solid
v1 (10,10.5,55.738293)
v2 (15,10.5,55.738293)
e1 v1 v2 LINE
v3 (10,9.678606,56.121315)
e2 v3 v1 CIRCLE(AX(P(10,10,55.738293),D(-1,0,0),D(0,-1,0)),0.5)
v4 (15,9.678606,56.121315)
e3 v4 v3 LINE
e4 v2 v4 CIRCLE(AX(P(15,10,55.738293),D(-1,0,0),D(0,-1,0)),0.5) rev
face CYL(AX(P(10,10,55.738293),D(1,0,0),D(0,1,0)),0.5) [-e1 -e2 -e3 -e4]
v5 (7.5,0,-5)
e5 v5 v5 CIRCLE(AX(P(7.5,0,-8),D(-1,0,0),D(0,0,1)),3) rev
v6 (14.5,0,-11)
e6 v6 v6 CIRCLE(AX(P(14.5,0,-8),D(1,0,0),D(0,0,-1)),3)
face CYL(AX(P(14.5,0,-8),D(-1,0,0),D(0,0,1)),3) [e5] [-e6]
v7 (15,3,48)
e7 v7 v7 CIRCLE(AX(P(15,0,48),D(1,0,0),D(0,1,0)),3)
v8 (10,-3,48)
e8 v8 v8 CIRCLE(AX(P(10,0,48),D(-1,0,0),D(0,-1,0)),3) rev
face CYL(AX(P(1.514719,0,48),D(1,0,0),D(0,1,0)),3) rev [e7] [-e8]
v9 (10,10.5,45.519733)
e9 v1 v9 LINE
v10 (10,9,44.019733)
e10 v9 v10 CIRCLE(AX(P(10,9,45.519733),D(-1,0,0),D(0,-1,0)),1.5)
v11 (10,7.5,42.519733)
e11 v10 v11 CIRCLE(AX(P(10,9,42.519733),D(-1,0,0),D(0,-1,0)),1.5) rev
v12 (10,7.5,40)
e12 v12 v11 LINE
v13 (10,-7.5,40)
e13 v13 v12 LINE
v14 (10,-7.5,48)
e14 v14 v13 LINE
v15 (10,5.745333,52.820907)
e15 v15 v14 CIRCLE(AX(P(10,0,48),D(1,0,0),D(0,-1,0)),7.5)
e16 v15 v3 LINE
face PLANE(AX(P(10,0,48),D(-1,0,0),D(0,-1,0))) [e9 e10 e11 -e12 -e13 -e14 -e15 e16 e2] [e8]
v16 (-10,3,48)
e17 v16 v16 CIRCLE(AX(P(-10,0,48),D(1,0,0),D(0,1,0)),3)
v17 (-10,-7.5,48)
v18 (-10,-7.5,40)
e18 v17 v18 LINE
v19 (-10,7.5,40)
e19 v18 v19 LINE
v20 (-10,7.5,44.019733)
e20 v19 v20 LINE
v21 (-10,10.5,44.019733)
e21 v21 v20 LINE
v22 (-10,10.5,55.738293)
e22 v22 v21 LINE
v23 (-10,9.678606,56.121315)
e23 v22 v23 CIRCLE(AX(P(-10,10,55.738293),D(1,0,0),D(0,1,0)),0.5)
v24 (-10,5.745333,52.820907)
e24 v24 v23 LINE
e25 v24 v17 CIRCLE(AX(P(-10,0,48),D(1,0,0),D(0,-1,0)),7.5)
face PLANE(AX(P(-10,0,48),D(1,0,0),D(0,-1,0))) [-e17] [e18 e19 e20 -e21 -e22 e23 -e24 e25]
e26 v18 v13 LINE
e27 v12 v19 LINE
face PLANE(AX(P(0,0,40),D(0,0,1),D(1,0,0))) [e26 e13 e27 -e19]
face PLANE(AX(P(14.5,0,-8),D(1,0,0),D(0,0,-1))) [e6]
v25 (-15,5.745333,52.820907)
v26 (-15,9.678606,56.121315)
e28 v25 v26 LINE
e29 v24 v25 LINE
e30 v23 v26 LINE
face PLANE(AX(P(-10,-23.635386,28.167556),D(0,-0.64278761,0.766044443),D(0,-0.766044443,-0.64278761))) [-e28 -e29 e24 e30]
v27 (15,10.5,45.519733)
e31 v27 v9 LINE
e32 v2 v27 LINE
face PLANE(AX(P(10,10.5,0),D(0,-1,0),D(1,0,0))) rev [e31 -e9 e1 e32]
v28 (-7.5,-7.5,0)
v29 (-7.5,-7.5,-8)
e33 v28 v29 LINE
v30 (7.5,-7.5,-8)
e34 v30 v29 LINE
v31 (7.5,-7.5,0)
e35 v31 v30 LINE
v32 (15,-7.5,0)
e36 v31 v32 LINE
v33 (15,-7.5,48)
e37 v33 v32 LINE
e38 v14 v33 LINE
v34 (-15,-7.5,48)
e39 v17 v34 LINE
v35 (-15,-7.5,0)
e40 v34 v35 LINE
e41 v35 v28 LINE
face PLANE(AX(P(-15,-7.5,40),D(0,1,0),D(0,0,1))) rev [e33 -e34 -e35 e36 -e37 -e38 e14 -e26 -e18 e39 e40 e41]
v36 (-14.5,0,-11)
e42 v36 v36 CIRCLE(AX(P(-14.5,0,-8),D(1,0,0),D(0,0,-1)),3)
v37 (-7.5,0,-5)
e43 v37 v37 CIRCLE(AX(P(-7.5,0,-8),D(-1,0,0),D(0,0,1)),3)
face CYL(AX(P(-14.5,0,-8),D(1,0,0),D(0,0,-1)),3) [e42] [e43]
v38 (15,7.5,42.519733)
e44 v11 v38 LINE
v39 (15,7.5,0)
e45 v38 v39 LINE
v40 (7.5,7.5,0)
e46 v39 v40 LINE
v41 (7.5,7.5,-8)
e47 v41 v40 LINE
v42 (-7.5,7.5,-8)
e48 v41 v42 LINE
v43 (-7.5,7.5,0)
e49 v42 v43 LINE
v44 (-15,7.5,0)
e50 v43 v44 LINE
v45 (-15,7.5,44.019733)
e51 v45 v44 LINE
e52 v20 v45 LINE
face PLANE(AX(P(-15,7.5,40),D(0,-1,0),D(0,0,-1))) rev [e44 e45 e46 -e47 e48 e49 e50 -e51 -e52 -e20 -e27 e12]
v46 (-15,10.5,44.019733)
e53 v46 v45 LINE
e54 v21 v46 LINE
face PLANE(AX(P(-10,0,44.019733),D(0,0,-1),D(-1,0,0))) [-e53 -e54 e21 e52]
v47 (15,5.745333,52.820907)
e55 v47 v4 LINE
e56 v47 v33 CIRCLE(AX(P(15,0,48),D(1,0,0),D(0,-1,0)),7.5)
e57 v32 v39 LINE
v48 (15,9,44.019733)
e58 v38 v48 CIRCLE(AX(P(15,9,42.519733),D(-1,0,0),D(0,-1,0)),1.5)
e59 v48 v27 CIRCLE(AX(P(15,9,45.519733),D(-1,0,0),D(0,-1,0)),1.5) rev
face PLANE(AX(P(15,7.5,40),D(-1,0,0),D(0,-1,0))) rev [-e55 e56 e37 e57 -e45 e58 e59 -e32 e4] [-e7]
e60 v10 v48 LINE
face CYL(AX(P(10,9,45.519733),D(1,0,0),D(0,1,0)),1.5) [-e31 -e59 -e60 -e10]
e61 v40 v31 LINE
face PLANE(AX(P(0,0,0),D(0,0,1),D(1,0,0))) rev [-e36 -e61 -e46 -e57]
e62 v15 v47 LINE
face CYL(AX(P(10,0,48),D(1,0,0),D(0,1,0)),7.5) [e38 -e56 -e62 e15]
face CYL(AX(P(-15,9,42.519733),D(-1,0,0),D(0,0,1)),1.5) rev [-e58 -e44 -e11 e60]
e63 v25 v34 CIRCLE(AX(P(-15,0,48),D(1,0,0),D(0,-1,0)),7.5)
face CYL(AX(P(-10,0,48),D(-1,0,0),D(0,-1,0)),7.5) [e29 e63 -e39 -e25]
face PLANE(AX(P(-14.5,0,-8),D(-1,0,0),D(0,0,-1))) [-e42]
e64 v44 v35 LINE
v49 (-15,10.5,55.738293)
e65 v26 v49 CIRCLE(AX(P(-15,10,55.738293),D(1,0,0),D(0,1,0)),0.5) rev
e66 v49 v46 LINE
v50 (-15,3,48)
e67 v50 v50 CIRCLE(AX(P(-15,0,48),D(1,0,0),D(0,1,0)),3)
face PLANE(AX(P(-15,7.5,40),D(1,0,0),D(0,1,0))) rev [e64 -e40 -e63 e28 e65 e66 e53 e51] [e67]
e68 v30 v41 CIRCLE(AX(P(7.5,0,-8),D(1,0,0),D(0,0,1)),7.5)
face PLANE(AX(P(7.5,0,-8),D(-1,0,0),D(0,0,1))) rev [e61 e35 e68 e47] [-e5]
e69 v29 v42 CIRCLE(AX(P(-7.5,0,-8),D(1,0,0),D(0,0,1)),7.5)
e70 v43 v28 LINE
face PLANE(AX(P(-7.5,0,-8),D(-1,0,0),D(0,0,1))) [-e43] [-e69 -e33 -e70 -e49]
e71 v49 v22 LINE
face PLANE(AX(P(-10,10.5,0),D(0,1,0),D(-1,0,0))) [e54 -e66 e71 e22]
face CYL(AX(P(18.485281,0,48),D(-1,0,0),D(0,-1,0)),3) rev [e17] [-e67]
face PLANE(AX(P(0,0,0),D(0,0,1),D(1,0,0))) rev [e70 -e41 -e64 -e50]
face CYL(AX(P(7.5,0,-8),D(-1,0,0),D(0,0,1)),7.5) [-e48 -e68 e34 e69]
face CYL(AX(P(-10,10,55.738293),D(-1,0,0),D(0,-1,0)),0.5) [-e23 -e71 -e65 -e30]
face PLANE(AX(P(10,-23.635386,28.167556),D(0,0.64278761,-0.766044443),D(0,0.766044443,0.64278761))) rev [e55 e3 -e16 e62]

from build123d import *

# Parameters (mm, degrees)
SKETCH_1_W             = 30
SKETCH_1_H             = 15
EXTRUDE_1_DEPTH        = 40
EXTRUDE_2_DEPTH        = 5
SKETCH_3_R             = 3
CUT_EXTRUDE_1_DEPTH    = 5
EXTRUDE_3_DEPTH        = 7.5
SKETCH_7_R             = 3
EXTRUDE_4_DEPTH        = 7
EXTRUDE_5_DEPTH        = 5
FILLET_2_R             = 1.5
FILLET_3_R             = 0.5
FILLET_3_OF_MIRROR_3_R = 0.5


with BuildPart() as part:
    # 草图1 → 凸台-拉伸1 (new body)
    with BuildSketch(Plane.XY):
        Rectangle(SKETCH_1_W, SKETCH_1_H)
    extrude(amount=EXTRUDE_1_DEPTH)

    # 草图2 → 凸台-拉伸2 (add)
    with BuildSketch(Plane(origin=(15, 0, 0), x_dir=(0, 0, -1), z_dir=(1, 0, 0))):
        with BuildLine():
            Line((-40, -7.5), (-48, -7.5))
            ThreePointArc((-48, -7.5), (-55.5, 0), (-48, 7.5))
            Line((-48, 7.5), (-40, 7.5))
            Line((-40, 7.5), (-40, -7.5))
        make_face()
    extrude_2 = extrude(amount=-EXTRUDE_2_DEPTH)

    # 草图3 → 切除-拉伸1 (cut)
    with BuildSketch(Plane(origin=(15, 0, 0), x_dir=(0, 0, -1), z_dir=(1, 0, 0))):
        with Locations(Location((-48, 0, 0), (0, 0, 90))):
            Circle(SKETCH_3_R)
    cut_extrude_1 = extrude(amount=-CUT_EXTRUDE_1_DEPTH, mode=Mode.SUBTRACT)

    # 镜向1: 凸台-拉伸2, 切除-拉伸1 across plane
    add(extrude_2.mirror(Plane(origin=(0, 0, 0), x_dir=(0, 0, 1), z_dir=(1, 0, 0))))
    add(cut_extrude_1.mirror(Plane(origin=(0, 0, 0), x_dir=(0, 0, 1), z_dir=(1, 0, 0))), mode=Mode.SUBTRACT)

    # 草图6 → 凸台-拉伸3 (add, symmetric)
    with BuildSketch(Plane(origin=(0, 0, 0), x_dir=(0, 0, -1), z_dir=(1, 0, 0))):
        with BuildLine():
            Line((0, 7.5), (8, 7.5))
            ThreePointArc((8, 7.5), (15.5, 0), (8, -7.5))
            Line((8, -7.5), (0, -7.5))
            Line((0, -7.5), (0, 7.5))
        make_face()
    extrude(amount=EXTRUDE_3_DEPTH, both=True)

    # 草图7 → 凸台-拉伸4 (add)
    with BuildSketch(Plane(origin=(7.5, 0, 0), x_dir=(0, 0, -1), z_dir=(1, 0, 0))):
        with Locations(Location((8, 0, 0), (0, 0, 180))):
            Circle(SKETCH_7_R)
    extrude_4 = extrude(amount=EXTRUDE_4_DEPTH)

    # 镜向2: 凸台-拉伸4 across plane
    add(extrude_4.mirror(Plane(origin=(0, 0, 0), x_dir=(0, 0, 1), z_dir=(1, 0, 0))))

    # 草图8 → 凸台-拉伸5 (add)
    with BuildSketch(Plane(origin=(15, 0, 0), x_dir=(0, 0, -1), z_dir=(1, 0, 0))):
        with BuildLine():
            Line((-56.810546127, 10.5), (-52.820907073, 5.745333323))
            ThreePointArc((-52.820907073, 5.745333323), (-50.565151075, 7.047694656), (-48, 7.5))
            Line((-48, 7.5), (-44.01973259, 7.5))
            Line((-44.01973259, 7.5), (-44.01973259, 10.5))
            Line((-44.01973259, 10.5), (-56.810546127, 10.5))
        make_face()
    extrude_5 = extrude(amount=-EXTRUDE_5_DEPTH)

    # 圆角2
    fillet_2_edges = [part.edges().sort_by_distance(p)[0] for p in [
        (12.5, 7.5, 44.01973259),
    ]]
    fillet(fillet_2_edges, radius=FILLET_2_R)
    fillet_2_2_edges = [part.edges().sort_by_distance(p)[0] for p in [
        (12.5, 10.5, 44.01973259),
    ]]
    fillet(fillet_2_2_edges, radius=FILLET_2_R - 0.0001)  # a hair under: the kernel refuses the full size

    # 圆角3
    fillet_3_edges = [part.edges().sort_by_distance(p)[0] for p in [
        (12.5, 10.5, 56.810546127),
    ]]
    fillet(fillet_3_edges, radius=FILLET_3_R)

    # 镜向3: 凸台-拉伸5 across plane
    add(extrude_5.mirror(Plane(origin=(0, 0, 0), x_dir=(0, 0, 1), z_dir=(1, 0, 0))))

    # 圆角3 of 镜向3
    fillet_3_of_mirror_3_edges = [part.edges().sort_by_distance(p)[0] for p in [
        (-12.5, 10.5, 56.810546127),
    ]]
    fillet(fillet_3_of_mirror_3_edges, radius=FILLET_3_OF_MIRROR_3_R)


solid = part.part
